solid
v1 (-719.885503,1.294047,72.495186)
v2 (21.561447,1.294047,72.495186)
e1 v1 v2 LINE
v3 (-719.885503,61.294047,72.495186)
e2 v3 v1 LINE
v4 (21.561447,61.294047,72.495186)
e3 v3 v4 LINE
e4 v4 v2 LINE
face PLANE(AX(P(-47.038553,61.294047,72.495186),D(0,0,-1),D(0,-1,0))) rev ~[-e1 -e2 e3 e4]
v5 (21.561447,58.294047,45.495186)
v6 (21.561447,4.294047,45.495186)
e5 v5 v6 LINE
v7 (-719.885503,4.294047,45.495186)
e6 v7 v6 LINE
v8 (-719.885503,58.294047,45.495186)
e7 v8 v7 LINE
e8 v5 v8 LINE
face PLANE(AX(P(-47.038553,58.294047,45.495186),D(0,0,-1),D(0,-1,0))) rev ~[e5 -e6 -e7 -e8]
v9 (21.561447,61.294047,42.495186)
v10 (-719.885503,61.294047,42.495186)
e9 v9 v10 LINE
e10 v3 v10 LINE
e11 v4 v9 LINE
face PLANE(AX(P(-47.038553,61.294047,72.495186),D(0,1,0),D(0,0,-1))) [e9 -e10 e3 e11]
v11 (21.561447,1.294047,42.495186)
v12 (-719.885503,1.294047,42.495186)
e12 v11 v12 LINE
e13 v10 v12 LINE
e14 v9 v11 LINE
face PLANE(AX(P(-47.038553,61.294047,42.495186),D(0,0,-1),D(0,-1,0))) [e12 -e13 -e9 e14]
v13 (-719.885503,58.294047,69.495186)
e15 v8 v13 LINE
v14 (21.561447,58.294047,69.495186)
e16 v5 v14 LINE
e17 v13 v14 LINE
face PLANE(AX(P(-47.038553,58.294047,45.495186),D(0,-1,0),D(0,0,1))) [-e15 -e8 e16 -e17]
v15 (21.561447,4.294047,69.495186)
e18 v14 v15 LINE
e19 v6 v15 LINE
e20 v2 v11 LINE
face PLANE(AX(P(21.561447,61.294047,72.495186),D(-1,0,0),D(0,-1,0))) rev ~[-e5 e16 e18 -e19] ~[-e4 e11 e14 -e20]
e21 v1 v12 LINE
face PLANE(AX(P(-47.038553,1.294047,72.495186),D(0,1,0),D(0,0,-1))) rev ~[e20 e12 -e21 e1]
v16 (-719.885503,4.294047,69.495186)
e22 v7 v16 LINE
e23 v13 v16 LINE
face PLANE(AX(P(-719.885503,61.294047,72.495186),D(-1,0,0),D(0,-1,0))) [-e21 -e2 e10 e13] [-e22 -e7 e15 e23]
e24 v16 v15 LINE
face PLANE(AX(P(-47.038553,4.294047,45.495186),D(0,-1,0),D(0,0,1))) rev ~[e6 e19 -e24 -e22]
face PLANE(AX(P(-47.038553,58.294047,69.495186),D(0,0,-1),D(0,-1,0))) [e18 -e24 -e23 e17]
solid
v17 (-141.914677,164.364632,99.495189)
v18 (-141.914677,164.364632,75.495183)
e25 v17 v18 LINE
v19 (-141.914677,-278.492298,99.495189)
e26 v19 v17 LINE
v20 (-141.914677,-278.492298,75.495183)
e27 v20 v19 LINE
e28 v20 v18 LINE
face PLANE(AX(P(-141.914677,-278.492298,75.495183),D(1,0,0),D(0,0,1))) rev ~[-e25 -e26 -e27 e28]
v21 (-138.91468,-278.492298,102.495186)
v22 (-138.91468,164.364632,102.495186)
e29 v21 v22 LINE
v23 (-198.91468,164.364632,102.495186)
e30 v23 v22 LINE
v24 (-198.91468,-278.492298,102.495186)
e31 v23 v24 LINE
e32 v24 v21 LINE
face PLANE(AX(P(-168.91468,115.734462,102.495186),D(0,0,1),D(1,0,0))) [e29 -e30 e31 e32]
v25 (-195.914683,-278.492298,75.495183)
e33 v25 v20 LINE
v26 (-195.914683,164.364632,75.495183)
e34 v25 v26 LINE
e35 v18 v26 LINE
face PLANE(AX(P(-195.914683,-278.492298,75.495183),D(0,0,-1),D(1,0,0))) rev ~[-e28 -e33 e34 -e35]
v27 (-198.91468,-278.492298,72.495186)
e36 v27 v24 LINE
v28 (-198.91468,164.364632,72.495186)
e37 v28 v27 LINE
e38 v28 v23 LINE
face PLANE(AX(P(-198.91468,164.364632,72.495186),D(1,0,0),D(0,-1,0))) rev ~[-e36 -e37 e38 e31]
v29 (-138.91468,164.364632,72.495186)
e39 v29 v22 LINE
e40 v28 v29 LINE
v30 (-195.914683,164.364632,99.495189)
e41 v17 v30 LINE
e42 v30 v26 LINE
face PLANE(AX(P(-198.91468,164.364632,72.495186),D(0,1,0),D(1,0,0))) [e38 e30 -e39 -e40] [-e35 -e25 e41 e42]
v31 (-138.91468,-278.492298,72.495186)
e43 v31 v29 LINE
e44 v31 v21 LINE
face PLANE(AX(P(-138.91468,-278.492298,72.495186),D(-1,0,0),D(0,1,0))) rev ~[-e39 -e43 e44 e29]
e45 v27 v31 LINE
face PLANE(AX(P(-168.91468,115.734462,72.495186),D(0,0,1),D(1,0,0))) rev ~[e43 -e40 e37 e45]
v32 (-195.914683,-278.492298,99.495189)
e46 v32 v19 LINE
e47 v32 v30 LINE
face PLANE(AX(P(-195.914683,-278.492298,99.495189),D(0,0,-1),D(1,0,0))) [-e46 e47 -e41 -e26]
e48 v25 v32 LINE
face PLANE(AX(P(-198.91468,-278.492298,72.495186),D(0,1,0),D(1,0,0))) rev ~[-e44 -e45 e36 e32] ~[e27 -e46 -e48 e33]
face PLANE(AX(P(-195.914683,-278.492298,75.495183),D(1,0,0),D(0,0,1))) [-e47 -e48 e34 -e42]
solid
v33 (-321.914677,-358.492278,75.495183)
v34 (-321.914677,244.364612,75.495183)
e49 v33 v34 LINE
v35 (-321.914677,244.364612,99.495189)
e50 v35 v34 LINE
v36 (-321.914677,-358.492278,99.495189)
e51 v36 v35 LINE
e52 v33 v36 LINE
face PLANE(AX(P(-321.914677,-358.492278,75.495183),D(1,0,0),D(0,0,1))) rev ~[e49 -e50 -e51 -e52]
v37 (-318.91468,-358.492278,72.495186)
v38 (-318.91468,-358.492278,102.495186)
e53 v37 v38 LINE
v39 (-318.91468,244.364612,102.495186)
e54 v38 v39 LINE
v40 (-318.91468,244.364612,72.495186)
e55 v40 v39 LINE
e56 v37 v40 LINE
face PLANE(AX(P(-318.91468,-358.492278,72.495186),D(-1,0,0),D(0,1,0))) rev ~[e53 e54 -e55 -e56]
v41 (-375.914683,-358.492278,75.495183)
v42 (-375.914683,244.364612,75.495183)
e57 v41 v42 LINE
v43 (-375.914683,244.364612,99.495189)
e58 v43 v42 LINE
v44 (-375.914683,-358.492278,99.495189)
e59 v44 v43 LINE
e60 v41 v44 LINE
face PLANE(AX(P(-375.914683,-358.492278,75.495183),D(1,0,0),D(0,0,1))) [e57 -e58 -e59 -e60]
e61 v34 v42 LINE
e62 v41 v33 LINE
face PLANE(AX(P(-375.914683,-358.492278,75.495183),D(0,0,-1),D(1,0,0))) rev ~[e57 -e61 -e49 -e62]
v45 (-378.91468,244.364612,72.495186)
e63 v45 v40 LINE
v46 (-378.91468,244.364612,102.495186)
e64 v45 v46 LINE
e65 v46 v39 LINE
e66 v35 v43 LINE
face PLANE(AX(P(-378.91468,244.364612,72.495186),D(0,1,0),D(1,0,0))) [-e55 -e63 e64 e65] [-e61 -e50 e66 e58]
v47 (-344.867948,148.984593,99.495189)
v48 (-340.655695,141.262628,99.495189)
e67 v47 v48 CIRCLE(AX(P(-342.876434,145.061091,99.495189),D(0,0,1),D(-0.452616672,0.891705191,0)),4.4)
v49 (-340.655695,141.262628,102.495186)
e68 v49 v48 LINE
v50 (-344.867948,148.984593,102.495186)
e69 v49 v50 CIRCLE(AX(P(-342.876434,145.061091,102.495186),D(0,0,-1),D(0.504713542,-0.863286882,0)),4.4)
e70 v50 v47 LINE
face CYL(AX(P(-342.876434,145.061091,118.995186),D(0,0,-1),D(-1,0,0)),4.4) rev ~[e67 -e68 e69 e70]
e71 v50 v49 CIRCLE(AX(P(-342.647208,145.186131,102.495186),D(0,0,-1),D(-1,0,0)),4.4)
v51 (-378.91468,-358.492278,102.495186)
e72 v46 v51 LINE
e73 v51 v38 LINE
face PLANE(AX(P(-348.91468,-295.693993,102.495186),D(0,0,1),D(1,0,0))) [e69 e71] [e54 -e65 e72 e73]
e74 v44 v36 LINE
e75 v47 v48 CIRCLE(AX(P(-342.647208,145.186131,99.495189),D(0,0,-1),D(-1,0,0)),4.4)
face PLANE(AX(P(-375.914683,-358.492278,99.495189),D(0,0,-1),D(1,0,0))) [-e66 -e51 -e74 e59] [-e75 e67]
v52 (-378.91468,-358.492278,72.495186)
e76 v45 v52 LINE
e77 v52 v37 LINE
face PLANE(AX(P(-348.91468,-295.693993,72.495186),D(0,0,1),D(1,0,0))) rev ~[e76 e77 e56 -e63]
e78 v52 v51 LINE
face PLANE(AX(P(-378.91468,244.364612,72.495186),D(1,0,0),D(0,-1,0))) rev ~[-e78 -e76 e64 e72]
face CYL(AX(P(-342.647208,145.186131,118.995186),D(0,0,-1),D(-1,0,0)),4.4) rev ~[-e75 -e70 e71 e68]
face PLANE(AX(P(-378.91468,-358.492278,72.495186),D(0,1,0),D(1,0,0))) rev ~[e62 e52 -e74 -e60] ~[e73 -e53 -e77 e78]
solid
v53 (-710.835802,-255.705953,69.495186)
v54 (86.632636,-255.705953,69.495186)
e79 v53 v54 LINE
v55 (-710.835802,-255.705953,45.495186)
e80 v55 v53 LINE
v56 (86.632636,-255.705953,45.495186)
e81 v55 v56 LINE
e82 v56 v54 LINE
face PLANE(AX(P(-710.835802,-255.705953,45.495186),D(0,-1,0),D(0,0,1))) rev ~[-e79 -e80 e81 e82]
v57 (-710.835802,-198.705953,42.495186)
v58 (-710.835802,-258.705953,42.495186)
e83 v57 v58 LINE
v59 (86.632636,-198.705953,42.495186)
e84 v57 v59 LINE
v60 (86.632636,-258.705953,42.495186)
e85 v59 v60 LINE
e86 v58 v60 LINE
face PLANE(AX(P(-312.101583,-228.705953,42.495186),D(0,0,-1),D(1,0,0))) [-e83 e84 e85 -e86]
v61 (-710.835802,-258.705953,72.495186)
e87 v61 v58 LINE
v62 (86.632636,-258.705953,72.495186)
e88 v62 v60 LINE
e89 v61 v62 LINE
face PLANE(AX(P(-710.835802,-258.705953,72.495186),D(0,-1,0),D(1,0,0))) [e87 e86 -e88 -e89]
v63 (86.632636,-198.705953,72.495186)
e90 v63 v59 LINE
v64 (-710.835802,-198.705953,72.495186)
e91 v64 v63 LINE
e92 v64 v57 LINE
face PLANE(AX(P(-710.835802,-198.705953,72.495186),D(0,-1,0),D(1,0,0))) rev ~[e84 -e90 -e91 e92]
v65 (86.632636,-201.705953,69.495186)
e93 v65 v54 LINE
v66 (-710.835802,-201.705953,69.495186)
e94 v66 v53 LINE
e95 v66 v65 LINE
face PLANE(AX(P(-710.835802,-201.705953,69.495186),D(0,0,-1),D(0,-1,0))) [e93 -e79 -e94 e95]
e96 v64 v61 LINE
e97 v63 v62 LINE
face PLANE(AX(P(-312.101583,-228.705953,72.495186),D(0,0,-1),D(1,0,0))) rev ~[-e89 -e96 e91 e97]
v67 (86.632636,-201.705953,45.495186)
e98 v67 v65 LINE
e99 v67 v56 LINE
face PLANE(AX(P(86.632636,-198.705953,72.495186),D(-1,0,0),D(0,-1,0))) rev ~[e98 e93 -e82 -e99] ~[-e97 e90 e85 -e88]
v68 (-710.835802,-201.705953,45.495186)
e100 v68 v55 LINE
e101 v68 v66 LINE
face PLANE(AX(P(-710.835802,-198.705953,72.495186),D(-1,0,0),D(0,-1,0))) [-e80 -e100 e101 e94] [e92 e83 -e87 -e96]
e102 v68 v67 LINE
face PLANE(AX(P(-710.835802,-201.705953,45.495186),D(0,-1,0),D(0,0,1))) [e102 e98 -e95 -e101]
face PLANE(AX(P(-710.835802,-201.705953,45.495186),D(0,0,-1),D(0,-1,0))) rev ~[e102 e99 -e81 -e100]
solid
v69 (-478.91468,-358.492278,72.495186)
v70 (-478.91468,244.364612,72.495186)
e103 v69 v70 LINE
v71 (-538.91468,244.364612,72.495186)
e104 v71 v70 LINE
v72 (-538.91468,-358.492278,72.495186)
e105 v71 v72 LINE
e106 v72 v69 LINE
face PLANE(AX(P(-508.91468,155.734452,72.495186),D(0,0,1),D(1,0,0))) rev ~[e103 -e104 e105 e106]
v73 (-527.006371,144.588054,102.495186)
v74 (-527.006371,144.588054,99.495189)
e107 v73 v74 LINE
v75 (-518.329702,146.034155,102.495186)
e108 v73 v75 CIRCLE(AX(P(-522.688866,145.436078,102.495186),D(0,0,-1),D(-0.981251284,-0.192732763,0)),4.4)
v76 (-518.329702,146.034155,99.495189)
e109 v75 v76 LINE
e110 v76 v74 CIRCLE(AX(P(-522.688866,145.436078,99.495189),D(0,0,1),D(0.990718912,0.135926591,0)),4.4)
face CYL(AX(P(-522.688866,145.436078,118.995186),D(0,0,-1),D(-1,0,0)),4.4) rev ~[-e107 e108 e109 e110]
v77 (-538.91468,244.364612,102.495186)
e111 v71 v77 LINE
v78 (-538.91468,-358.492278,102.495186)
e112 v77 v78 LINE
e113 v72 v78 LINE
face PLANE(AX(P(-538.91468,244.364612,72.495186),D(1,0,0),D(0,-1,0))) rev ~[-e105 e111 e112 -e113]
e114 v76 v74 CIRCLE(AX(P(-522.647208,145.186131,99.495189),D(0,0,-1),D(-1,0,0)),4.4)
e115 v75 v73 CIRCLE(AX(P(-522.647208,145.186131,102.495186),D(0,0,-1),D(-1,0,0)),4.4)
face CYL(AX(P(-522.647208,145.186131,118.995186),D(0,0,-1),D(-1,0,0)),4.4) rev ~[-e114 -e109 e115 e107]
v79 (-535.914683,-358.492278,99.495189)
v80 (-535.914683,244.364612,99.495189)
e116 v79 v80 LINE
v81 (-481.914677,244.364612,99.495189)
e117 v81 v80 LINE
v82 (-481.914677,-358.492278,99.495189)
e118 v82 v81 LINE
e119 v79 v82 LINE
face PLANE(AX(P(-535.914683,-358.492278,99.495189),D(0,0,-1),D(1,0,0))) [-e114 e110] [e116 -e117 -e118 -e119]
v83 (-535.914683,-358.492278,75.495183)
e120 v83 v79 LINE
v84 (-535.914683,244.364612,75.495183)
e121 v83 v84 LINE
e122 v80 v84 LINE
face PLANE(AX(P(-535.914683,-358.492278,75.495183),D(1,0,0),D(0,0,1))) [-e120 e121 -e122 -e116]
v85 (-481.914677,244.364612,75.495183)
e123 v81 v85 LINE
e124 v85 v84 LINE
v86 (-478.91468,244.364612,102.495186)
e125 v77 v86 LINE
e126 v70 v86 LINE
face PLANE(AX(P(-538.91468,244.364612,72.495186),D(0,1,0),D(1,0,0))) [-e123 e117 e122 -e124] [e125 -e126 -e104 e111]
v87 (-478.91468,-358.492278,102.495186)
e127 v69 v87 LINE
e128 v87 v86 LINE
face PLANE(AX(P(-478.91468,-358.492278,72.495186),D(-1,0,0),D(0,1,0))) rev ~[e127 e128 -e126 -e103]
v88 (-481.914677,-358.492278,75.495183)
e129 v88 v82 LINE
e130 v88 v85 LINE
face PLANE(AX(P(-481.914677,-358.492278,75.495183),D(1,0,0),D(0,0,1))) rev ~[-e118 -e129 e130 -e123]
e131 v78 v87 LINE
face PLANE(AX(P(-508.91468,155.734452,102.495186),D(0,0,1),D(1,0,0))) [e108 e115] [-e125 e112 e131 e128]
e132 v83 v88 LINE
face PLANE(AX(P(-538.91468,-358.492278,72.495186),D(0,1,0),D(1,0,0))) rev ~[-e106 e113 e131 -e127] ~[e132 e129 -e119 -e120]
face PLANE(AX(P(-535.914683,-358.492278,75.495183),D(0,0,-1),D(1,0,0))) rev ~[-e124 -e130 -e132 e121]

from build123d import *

# Parameters (mm, degrees)
F0_W        = 60
F0_H        = 30
F1_DEPTH    = 158
F2_W        = 66.2892647088
F2_H        = 29.4618904591
F3_DEPTH    = 300
F2_W_2      = 68.393683061
F2_H_2      = 30.5141024292
F2_W_3      = 67.3414766788
F4_W        = 47.0454245806
F4_H        = 22.7635130286
F5_DEPTH    = 400
F4_W_2      = 49.3977004662
F4_H_2      = 23.8089710474
F6_DEPTH    = 50
F7_W        = 61.1065607518
F7_H        = 23.5696807504
F8_DEPTH    = 300
F9_W        = 60.6583654881
F9_H        = 23.7780623138
F9_W_2      = 61.8215240538
F9_H_2      = 23.7314254045
F10_DEPTH   = 300.001
F11_W       = 61.2598918378
F11_H       = 23.6744321883
F12_DEPTH   = 300.001
F13_W       = 41.8233666569
F13_H       = 17.940826714
F14_DEPTH   = 450.001
F15_W       = 0.6950423121
F15_H       = 16.4160877466
F15_W_2     = 41.8233666569
F15_W_3     = 0.0805514865
F16_DEPTH   = 450.001
F18_R       = 8.0737977812
F18_R_2     = 2.2693206324
F19_DEPTH   = 10
F21_W       = 60
F21_H       = 177.2603205867
F21_H_2     = 60
F21_H_3     = 180
F21_H_4     = 125.5965695061
F22_DEPTH   = 30
F21_H_5     = 97.260340693
F21_H_6     = 45.5965896123
F23_W       = 797.4684381369
F23_H       = 60
F24_DEPTH   = 30
F23_W_2     = 826.1469494374
F25_W       = 54.0000002086
F25_H       = 24.0000002086
F26_DEPTH   = 877.8865025663
F27_W       = 54.0000002086
F27_H       = 24.0000002086
F28_DEPTH   = 868.8368023466
F29_W       = 54.000005275
F29_H       = 24.000005275
F30_DEPTH   = 602.8578900928
F31_W       = 54.000005275
F31_H       = 24.000005275
F32_DEPTH   = 602.8578900928
F33_W       = 54.000005275
F33_H       = 24.000005275
F34_DEPTH   = 522.857910199
F35_DEPTH   = 153.3
F37_DEPTH   = 68.6
F40_D       = 8.8
F40_DEPTH   = 16.5
F40_TIP     = 2.6437867237
F40_2_D     = 8.8
F40_2_DEPTH = 16.5
F40_2_TIP   = 2.6437867237
F41_D       = 8.8
F41_DEPTH   = 16.5
F41_TIP     = 2.6437867237
F41_2_D     = 8.8
F41_2_DEPTH = 16.5
F41_2_TIP   = 2.6437867237


# Not quite as in the source:
# - a feature names something its author has since deleted; it is built from what else it names


with BuildPart() as f1:
    # F0 (on Right) → F1 (new body)
    with BuildSketch(Plane.YZ):
        with Locations((-26.7016614429, 57.4951861054)):
            Rectangle(F0_W, F0_H)
    extrude(amount=F1_DEPTH)


with BuildPart() as f3:
    # F2 (on face) → F3 (new body)
    with BuildSketch(Plane.XZ.offset(56.7016614429)):
        with Locations((-55.3080569953, -72.8603079915)):
            Rectangle(F2_W, F2_H)
    extrude(amount=-F3_DEPTH)

    # F7 (on face) → F8 (cut, through all)
    with BuildSketch(Plane.XZ.offset(56.7016614429)):
        with Locations((-55.1617154852, -72.5816227496)):
            Rectangle(F7_W, F7_H)
    extrude(amount=-F8_DEPTH, mode=Mode.SUBTRACT)


with BuildPart() as f3b:
    # F2 (on face) → F3, piece 2 (new body)
    with BuildSketch(Plane.XZ.offset(56.7016614429)):
        with Locations((56.2262581661, -72.3342020065)):
            Rectangle(F2_W_2, F2_H_2)
    extrude(amount=-F3_DEPTH)


with BuildPart() as f3c:
    # F2 (on face) → F3, piece 3 (new body)
    with BuildSketch(Plane.XZ.offset(56.7016614429)):
        with Locations((181.9654107094, -72.3342020065)):
            Rectangle(F2_W_3, F2_H_2)
    extrude(amount=-F3_DEPTH)


with BuildPart() as f5:
    # F4 (on face) → F5 (new body)
    with BuildSketch(Plane(origin=(-88.4526893497, 0, 0), x_dir=(0, -1, 0), z_dir=(-1, 0, 0))):
        with Locations((-189.4800886512, -98.9730097353)):
            Rectangle(F4_W, F4_H)
    extrude(amount=-F5_DEPTH)


with BuildPart() as f5b:
    # F4 (on face) → F5, piece 2 (new body)
    with BuildSketch(Plane(origin=(-88.4526893497, 0, 0), x_dir=(0, -1, 0), z_dir=(-1, 0, 0))):
        with Locations((-13.9745208435, -99.4957387447)):
            Rectangle(F4_W_2, F4_H_2)
    extrude(amount=-F5_DEPTH)


with BuildPart() as f6:
    # F6 (new): a face of the model
    f6_faces = [f5.part.faces().sort_by_distance(p)[0] for p in [
        (-88.4526893497, 189.4800886512, -98.9730097353),
    ]]
    extrude(f6_faces, amount=F6_DEPTH)


with BuildPart() as f6b:
    # F6#2 (new): a face of the model
    f6_2_faces = [f5b.part.faces().sort_by_distance(p)[0] for p in [
        (-88.4526893497, 13.9745208435, -99.4957387447),
    ]]
    extrude(f6_2_faces, amount=F6_DEPTH)


with BuildPart() as f10_tool:
    # F9 (on face) → F10 (new body, through all)
    with BuildSketch(Plane.XZ.offset(56.7016614429)):
        with Locations((181.9215863943, -72.4789816886)):
            Rectangle(F9_W, F9_H)
        with Locations((56.3811119646, -72.2706690431)):
            Rectangle(F9_W_2, F9_H_2)
    extrude(amount=-F10_DEPTH)


with BuildPart() as f3b_1:
    add(f3b.part)

    # F10: cut by f10_tool
    add(f10_tool.part, mode=Mode.SUBTRACT)

    # F11 (on face) → F12 (cut, through all)
    with BuildSketch(Plane.XZ.offset(56.7016614429)):
        with Locations((55.9759307653, -72.5225340575)):
            Rectangle(F11_W, F11_H)
    extrude(amount=-F12_DEPTH, mode=Mode.SUBTRACT)


with BuildPart() as f3c_1:
    add(f3c.part)

    # F10: cut by f10_tool
    add(f10_tool.part, mode=Mode.SUBTRACT)


with BuildPart() as f14_tool:
    # F13 (on face) → F14 (new body, through all)
    with BuildSketch(Plane.YZ.offset(311.5473106503)):
        with Locations((13.9583600685, -99.7032783926)):
            Rectangle(F13_W, F13_H)
    extrude(amount=-F14_DEPTH)


with BuildPart() as f5b_1:
    add(f5b.part)

    # F14: cut by f14_tool
    add(f14_tool.part, mode=Mode.SUBTRACT)


with BuildPart() as f6b_1:
    add(f6b.part)

    # F14: cut by f14_tool
    add(f14_tool.part, mode=Mode.SUBTRACT)


with BuildPart() as f16_tool:
    # F15 (on face) → F16 (new body, through all)
    with BuildSketch(Plane(origin=(-138.4526893497, 0, 0), x_dir=(0, -1, 0), z_dir=(-1, 0, 0))):
        with Locations((-35.217564553, -99.4463041425)):
            Rectangle(F15_W, F15_H)
        with Locations((-13.9583600685, -99.4463041425)):
            Rectangle(F15_W_2, F15_H)
        with Locations((6.9935990032, -99.4463041425)):
            Rectangle(F15_W_3, F15_H)
    extrude(amount=-F16_DEPTH)


with BuildPart() as f5b_2:
    add(f5b_1.part)

    # F16: cut by f16_tool
    add(f16_tool.part, mode=Mode.SUBTRACT)


with BuildPart() as f6b_2:
    add(f6b_1.part)

    # F16: cut by f16_tool
    add(f16_tool.part, mode=Mode.SUBTRACT)


with BuildPart() as f19:
    # F18 (on face) → F19 (new body)
    with BuildSketch(Plane.XY.offset(72.4951861054)):
        with Locations((62.8524050117, -9.2268595472)):
            Circle(F18_R)
        with Locations((59.0920038521, -6.9042602554)):
            Circle(F18_R_2, mode=Mode.SUBTRACT)
    extrude(amount=F19_DEPTH)


with BuildPart() as f22:
    # F21 (on face) → F22 (new body)
    with BuildSketch(Plane.XY.offset(72.4951861054)):
        with Locations((-508.9146799214, 155.734451874)):
            Rectangle(F21_W, F21_H)
        with Locations((-508.9146799214, 37.1042915806)):
            Rectangle(F21_W, F21_H_2)
        with Locations((-508.9146799214, -82.8957084194)):
            Rectangle(F21_W, F21_H_3)
        with Locations((-508.9146799214, -202.8957084194)):
            Rectangle(F21_W, F21_H_2)
        with Locations((-508.9146799214, -295.6939931724)):
            Rectangle(F21_W, F21_H_4)
    extrude(amount=F22_DEPTH)

    # F29 (on face) → F30 (cut, through all)
    with BuildSketch(Plane.XZ.offset(358.4922779254)):
        with Locations((-508.9146799214, 87.4951861054)):
            Rectangle(F29_W, F29_H)
    extrude(amount=-F30_DEPTH, mode=Mode.SUBTRACT)

    # F40
    with Locations(Plane.XY.offset(102.4951861054)):
        with Locations((-522.6472080988, 145.1861311495), (-342.6472080988, 145.1861311495)):
            Hole(F40_D / 2, depth=F40_DEPTH)
            with Locations((0, 0, -(F40_DEPTH + F40_TIP / 2))):  # 118° drill point
                Cone(0, F40_D / 2, F40_TIP, mode=Mode.SUBTRACT)

    # F41
    with Locations(Plane.XY.offset(102.4951861054)):
        with Locations((-522.6888656616, 145.43607831), (-342.8764343262, 145.0610905886)):
            Hole(F41_D / 2, depth=F41_DEPTH)
            with Locations((0, 0, -(F41_DEPTH + F41_TIP / 2))):  # 118° drill point
                Cone(0, F41_D / 2, F41_TIP, mode=Mode.SUBTRACT)


with BuildPart() as f22b:
    # F21 (on face) → F22, piece 2 (new body)
    with BuildSketch(Plane.XY.offset(72.4951861054)):
        with Locations((-348.9146799214, -295.6939931724)):
            Rectangle(F21_W, F21_H_4)
        with Locations((-348.9146799214, -202.8957084194)):
            Rectangle(F21_W, F21_H_2)
        with Locations((-348.9146799214, -82.8957084194)):
            Rectangle(F21_W, F21_H_3)
        with Locations((-348.9146799214, 37.1042915806)):
            Rectangle(F21_W, F21_H_2)
        with Locations((-348.9146799214, 155.734451874)):
            Rectangle(F21_W, F21_H)
    extrude(amount=F22_DEPTH)

    # F31 (on face) → F32 (cut, through all)
    with BuildSketch(Plane.XZ.offset(358.4922779254)):
        with Locations((-348.9146799214, 87.4951861054)):
            Rectangle(F31_W, F31_H)
    extrude(amount=-F32_DEPTH, mode=Mode.SUBTRACT)

    # F40#2
    with Locations(Plane.XY.offset(102.4951861054)):
        with Locations((-522.6472080988, 145.1861311495), (-342.6472080988, 145.1861311495)):
            Hole(F40_2_D / 2, depth=F40_2_DEPTH)
            with Locations((0, 0, -(F40_2_DEPTH + F40_2_TIP / 2))):  # 118° drill point
                Cone(0, F40_2_D / 2, F40_2_TIP, mode=Mode.SUBTRACT)

    # F41#2
    with Locations(Plane.XY.offset(102.4951861054)):
        with Locations((-522.6888656616, 145.43607831), (-342.8764343262, 145.0610905886)):
            Hole(F41_2_D / 2, depth=F41_2_DEPTH)
            with Locations((0, 0, -(F41_2_DEPTH + F41_2_TIP / 2))):  # 118° drill point
                Cone(0, F41_2_D / 2, F41_2_TIP, mode=Mode.SUBTRACT)


with BuildPart() as f22c:
    # F21 (on face) → F22, piece 3 (new body)
    with BuildSketch(Plane.XY.offset(72.4951861054)):
        with Locations((-168.9146799214, 115.7344619271)):
            Rectangle(F21_W, F21_H_5)
        with Locations((-168.9146799214, 37.1042915806)):
            Rectangle(F21_W, F21_H_2)
        with Locations((-168.9146799214, -82.8957084194)):
            Rectangle(F21_W, F21_H_3)
        with Locations((-168.9146799214, -202.8957084194)):
            Rectangle(F21_W, F21_H_2)
        with Locations((-168.9146799214, -255.6940032255)):
            Rectangle(F21_W, F21_H_6)
    extrude(amount=F22_DEPTH)

    # F33 (on face) → F34 (cut, through all)
    with BuildSketch(Plane.XZ.offset(278.4922980317)):
        with Locations((-168.9146799214, 87.4951861054)):
            Rectangle(F33_W, F33_H)
    extrude(amount=-F34_DEPTH, mode=Mode.SUBTRACT)


with BuildPart() as f24:
    # F23 (on face) → F24 (new body)
    with BuildSketch(Plane(origin=(0, 0, 72.4951861054), x_dir=(1, 0, 0), z_dir=(0, 0, -1))):
        with Locations((-312.1015832781, 228.705952694)):
            Rectangle(F23_W, F23_H)
    extrude(amount=F24_DEPTH)

    # F27 (on face) → F28 (cut, through all)
    with BuildSketch(Plane(origin=(-710.8358023466, 0, 0), x_dir=(0, -1, 0), z_dir=(-1, 0, 0))):
        with Locations((228.705952694, 57.4951861054)):
            Rectangle(F27_W, F27_H)
    extrude(amount=-F28_DEPTH, mode=Mode.SUBTRACT)


with BuildPart() as f24b:
    # F23 (on face) → F24, piece 2 (new body)
    with BuildSketch(Plane(origin=(0, 0, 72.4951861054), x_dir=(1, 0, 0), z_dir=(0, 0, -1))):
        with Locations((-306.8120278476, -31.294047306)):
            Rectangle(F23_W_2, F23_H)
    extrude(amount=F24_DEPTH)

    # F25 (on face) → F26 (cut, through all)
    with BuildSketch(Plane(origin=(-719.8855025663, 0, 0), x_dir=(0, -1, 0), z_dir=(-1, 0, 0))):
        with Locations((-31.294047306, 57.4951861054)):
            Rectangle(F25_W, F25_H)
    extrude(amount=-F26_DEPTH, mode=Mode.SUBTRACT)


with BuildPart() as f35_tool:
    # F35 (cut): a face of the model
    f35_faces = [f24b.part.faces().sort_by_distance(p)[0] for p in [
        (106.2614468711, 60.6232269128, 57.4951861054),
    ]]
    extrude(f35_faces, amount=-F35_DEPTH)


with BuildPart() as f1_1:
    add(f1.part)

    # F35: cut by f35_tool
    add(f35_tool.part, mode=Mode.SUBTRACT)


with BuildPart() as f24b_1:
    add(f24b.part)

    # F35: cut by f35_tool
    add(f35_tool.part, mode=Mode.SUBTRACT)

    # F37 (add): a face of the model
    f37_faces = [f24b_1.faces().sort_by_distance(p)[0] for p in [
        (-47.0385531289, 60.6232269128, 57.4951861054),
    ]]
    extrude(f37_faces, amount=F37_DEPTH)


solid = Compound([f22.part, f22b.part, f22c.part, f24.part, f24b_1.part])
